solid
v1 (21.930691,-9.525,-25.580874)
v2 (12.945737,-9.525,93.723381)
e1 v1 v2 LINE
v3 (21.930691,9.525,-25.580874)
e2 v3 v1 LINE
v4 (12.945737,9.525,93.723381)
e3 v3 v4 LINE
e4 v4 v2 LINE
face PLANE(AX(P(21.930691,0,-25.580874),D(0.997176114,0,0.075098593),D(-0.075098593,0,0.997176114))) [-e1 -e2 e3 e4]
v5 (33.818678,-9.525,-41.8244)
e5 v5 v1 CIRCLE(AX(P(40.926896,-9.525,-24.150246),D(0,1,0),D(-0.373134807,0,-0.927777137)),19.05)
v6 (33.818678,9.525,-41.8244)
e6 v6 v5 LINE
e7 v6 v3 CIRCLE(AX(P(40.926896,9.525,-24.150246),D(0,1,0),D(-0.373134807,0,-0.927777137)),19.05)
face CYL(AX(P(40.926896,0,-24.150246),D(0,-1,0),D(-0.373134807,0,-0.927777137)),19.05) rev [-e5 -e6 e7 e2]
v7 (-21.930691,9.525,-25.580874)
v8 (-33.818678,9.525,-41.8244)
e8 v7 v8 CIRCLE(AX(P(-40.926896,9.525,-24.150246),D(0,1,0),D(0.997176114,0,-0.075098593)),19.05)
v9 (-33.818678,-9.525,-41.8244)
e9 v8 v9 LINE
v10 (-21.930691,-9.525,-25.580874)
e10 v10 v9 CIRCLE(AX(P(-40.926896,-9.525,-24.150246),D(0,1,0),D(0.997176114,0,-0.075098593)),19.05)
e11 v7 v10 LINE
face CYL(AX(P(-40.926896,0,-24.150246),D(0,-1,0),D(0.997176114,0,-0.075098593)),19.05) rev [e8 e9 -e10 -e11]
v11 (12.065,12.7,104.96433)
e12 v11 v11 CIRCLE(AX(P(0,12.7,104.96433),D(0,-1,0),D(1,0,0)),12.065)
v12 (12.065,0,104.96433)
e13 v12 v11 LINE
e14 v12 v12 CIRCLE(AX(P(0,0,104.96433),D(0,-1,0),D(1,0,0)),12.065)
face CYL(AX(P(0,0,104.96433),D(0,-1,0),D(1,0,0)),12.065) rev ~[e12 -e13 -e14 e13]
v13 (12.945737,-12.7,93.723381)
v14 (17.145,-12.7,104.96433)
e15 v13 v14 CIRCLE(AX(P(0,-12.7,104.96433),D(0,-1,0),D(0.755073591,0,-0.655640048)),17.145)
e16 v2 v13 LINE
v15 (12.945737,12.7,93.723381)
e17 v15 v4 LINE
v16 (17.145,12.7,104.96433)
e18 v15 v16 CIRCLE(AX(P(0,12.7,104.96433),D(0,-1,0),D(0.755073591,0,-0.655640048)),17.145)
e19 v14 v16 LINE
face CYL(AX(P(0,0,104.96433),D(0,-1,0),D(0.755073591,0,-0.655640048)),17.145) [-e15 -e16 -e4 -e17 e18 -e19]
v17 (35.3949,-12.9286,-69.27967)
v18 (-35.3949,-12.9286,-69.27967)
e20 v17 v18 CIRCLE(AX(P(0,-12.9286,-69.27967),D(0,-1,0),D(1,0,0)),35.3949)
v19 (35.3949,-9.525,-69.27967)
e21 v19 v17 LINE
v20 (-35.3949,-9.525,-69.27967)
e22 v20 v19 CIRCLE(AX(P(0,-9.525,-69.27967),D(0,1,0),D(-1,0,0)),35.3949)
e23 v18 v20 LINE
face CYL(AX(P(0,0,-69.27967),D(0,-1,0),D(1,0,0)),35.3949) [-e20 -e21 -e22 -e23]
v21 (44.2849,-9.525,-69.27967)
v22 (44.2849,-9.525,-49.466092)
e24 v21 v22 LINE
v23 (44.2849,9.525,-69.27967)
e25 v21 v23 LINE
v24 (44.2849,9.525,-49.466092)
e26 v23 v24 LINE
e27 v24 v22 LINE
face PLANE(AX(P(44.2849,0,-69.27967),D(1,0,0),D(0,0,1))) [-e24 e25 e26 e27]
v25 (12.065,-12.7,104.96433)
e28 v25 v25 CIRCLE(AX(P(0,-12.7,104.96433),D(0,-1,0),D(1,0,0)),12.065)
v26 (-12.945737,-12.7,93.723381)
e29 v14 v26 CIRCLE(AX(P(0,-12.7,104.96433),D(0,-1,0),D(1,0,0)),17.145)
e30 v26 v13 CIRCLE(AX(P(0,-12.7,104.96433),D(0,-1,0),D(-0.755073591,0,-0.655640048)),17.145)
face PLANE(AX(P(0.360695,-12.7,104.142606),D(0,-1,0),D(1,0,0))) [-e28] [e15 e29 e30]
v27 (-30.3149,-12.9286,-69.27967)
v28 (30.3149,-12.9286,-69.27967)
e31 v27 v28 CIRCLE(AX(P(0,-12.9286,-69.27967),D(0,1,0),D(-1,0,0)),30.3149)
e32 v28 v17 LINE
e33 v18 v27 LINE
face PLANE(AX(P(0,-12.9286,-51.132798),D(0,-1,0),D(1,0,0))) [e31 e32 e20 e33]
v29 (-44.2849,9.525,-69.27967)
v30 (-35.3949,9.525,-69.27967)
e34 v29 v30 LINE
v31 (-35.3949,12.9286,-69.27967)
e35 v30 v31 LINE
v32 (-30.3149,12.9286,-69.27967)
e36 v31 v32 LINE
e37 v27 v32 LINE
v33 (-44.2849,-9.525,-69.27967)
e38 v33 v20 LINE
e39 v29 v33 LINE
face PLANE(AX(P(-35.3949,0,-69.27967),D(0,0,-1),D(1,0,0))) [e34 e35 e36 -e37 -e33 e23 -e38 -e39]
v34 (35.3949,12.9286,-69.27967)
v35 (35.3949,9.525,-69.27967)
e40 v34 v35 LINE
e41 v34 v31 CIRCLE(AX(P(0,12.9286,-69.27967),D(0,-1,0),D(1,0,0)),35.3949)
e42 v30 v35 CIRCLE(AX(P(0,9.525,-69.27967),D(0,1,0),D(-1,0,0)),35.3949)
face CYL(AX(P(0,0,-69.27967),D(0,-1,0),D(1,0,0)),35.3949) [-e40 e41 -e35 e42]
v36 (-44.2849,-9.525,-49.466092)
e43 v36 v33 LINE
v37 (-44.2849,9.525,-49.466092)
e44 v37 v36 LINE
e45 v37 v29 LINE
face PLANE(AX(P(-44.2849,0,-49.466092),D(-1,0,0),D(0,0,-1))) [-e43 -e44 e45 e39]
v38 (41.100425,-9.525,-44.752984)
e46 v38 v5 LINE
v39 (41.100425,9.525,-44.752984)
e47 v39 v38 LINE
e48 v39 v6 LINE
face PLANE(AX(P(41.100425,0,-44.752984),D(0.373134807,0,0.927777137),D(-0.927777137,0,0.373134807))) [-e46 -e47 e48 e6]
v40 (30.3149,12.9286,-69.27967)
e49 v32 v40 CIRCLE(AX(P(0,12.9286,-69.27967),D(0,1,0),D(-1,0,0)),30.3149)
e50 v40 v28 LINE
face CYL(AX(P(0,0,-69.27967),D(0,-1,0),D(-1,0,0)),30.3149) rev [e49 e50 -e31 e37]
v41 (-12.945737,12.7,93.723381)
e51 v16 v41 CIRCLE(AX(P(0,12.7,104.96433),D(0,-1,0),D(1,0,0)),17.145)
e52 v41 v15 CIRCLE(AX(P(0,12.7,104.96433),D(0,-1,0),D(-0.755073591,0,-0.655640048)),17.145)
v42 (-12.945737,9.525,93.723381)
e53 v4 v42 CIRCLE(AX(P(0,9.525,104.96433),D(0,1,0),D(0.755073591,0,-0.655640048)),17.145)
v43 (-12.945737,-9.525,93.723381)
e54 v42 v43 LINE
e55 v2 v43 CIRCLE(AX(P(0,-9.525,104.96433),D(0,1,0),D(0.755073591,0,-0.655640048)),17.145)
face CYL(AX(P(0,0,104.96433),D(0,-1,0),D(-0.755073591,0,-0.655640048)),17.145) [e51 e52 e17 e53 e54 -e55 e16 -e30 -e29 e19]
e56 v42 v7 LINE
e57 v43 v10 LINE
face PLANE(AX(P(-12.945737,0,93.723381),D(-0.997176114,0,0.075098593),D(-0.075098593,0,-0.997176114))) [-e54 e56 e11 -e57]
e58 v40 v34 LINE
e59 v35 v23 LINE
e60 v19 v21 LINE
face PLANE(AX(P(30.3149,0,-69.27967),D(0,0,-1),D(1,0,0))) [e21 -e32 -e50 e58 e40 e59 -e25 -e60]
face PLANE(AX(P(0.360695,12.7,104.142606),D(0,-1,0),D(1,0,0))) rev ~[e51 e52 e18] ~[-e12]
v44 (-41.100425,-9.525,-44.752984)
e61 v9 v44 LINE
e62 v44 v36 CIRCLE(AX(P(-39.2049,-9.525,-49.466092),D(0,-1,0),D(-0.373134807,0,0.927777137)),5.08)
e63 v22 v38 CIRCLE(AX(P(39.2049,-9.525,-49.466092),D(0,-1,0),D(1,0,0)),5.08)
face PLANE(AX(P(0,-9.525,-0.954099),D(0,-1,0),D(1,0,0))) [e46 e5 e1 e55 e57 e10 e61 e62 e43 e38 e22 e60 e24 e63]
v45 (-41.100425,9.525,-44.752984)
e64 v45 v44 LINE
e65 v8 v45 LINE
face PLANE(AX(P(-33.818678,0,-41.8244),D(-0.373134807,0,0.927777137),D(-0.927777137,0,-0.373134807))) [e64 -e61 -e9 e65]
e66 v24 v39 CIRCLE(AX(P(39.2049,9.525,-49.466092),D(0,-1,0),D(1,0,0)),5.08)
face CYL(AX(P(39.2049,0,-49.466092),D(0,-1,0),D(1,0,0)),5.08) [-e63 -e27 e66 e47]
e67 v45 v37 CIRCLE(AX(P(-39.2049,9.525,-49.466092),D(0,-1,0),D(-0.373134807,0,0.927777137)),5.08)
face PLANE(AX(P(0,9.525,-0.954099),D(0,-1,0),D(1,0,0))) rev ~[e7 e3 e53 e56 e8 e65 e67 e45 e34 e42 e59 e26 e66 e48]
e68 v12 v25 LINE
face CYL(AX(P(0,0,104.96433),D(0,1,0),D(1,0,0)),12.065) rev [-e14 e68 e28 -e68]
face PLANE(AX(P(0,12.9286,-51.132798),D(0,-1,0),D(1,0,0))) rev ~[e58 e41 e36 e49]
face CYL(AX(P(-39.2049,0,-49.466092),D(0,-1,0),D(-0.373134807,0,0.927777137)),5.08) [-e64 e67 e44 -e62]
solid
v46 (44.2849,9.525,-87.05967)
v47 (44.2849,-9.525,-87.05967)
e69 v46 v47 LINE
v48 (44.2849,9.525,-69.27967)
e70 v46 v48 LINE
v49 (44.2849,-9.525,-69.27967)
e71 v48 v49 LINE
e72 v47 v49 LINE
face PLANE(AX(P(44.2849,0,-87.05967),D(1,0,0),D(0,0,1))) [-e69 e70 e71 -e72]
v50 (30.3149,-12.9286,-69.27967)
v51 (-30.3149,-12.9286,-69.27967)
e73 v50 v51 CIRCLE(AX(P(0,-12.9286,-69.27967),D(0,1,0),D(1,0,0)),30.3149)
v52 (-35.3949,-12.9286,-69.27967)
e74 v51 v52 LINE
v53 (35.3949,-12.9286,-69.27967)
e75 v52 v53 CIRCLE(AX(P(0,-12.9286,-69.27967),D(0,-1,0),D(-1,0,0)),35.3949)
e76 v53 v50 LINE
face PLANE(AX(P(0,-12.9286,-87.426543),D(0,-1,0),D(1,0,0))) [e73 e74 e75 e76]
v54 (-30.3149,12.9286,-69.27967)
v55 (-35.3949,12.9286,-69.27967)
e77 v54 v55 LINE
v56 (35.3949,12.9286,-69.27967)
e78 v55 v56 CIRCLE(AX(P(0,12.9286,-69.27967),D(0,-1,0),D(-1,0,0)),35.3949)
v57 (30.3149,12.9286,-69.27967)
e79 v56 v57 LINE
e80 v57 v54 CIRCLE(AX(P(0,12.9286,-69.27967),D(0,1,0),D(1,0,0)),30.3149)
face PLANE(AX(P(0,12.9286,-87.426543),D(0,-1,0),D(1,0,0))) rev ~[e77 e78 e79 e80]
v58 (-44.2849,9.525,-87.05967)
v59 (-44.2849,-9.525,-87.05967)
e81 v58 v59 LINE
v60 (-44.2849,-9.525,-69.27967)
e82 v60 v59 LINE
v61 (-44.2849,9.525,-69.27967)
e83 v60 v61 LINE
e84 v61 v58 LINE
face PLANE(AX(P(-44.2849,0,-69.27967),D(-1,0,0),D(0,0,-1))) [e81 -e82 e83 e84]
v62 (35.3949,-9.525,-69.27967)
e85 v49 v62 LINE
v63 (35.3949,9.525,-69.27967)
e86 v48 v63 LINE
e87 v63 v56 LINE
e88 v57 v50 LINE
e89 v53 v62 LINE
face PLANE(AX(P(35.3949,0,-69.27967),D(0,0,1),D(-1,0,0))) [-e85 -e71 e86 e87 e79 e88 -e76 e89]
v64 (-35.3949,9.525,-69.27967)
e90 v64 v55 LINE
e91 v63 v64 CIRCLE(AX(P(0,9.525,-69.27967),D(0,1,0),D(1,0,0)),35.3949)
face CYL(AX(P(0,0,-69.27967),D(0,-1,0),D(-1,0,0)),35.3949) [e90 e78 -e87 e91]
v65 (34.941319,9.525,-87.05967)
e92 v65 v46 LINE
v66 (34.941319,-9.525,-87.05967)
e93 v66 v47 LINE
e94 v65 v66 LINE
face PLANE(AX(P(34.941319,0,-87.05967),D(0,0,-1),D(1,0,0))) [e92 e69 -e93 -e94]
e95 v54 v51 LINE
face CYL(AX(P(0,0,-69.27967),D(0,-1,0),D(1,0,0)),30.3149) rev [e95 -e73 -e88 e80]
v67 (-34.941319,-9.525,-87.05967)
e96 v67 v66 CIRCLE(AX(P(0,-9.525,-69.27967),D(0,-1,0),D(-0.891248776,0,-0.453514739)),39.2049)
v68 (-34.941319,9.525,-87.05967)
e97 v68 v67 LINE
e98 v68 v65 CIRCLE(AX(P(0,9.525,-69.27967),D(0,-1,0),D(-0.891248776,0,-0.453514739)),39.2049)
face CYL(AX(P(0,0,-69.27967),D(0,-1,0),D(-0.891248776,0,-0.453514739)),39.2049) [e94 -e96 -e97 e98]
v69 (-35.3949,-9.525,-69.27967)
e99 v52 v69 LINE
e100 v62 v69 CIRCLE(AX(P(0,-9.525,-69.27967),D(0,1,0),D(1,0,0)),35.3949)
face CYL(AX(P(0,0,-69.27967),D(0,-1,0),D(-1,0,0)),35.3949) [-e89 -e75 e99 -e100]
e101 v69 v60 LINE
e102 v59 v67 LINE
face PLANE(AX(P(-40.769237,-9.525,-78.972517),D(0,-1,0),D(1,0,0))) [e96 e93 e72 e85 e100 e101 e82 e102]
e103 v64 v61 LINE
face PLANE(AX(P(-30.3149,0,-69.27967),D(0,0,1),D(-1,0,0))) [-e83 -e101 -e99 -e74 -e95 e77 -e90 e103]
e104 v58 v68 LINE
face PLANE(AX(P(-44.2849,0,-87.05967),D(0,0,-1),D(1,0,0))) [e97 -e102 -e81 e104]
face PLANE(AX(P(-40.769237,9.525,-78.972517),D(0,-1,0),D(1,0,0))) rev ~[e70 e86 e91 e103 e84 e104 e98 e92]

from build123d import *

# Parameters (mm, degrees)
F1_DEPTH = 12.9286
F2_DEPTH = 9.525
F3_DEPTH = 12.9286
F4_DEPTH = 9.525
F0_R     = 12.065
F5_DEPTH = 12.7


with BuildPart() as f1:
    # F0 (on Front) → F1 (new body, symmetric)
    with BuildSketch(Plane.XZ):
        with BuildLine():
            ThreePointArc((-30.3149, -69.2796702024), (0, -38.9647702024), (30.3149, -69.2796702024))
            Line((30.3149, -69.2796702024), (35.3949, -69.2796702024))
            ThreePointArc((35.3949, -69.2796702024), (0, -33.8847702024), (-35.3949, -69.2796702024))
            Line((-35.3949, -69.2796702024), (-30.3149, -69.2796702024))
        make_face()
    extrude(amount=F1_DEPTH, both=True)

    # F0 (on Front) → F2 (join, symmetric)
    with BuildSketch(Plane.XZ):
        with BuildLine():
            ThreePointArc((-39.2049, -69.2796702024), (0, -30.0747702024), (39.2049, -69.2796702024))
            Line((39.2049, -69.2796702024), (44.2849, -69.2796702024))
            Line((44.2849, -69.2796702024), (44.2849, -49.4660918501))
            ThreePointArc((44.2849, -49.4660918501), (43.4141556404, -46.6220512467), (41.1004248213, -44.7529839952))
            Line((41.1004248213, -44.7529839952), (33.8186777373, -41.8243999769))
            ThreePointArc((33.8186777373, -41.8243999769), (25.5540866411, -35.4009894091), (21.9306908548, -25.5808737129))
            Line((21.9306908548, -25.5808737129), (12.9457367136, 93.7233811748))
            ThreePointArc((12.9457367136, 93.7233811748), (0, 87.8193297976), (-12.9457367136, 93.7233811748))
            Line((-12.9457367136, 93.7233811748), (-21.9306908548, -25.5808737129))
            ThreePointArc((-21.9306908548, -25.5808737129), (-25.5540866411, -35.4009894091), (-33.8186777373, -41.8243999769))
            Line((-33.8186777373, -41.8243999769), (-41.1004248213, -44.7529839952))
            ThreePointArc((-41.1004248213, -44.7529839952), (-43.4141556404, -46.6220512467), (-44.2849, -49.4660918501))
            Line((-44.2849, -49.4660918501), (-44.2849, -69.2796702024))
            Line((-44.2849, -69.2796702024), (-39.2049, -69.2796702024))
        make_face()
        with BuildLine():
            ThreePointArc((-35.3949, -69.2796702024), (0, -33.8847702024), (35.3949, -69.2796702024))
            Line((35.3949, -69.2796702024), (39.2049, -69.2796702024))
            ThreePointArc((39.2049, -69.2796702024), (0, -30.0747702024), (-39.2049, -69.2796702024))
            Line((-39.2049, -69.2796702024), (-35.3949, -69.2796702024))
        make_face()
    extrude(amount=F2_DEPTH, both=True)

    # F0 (on Front) → F5 (join, symmetric)
    with BuildSketch(Plane.XZ):
        with BuildLine():
            ThreePointArc((-12.9457367136, 93.7233811748), (0, 87.8193297976), (12.9457367136, 93.7233811748))
            ThreePointArc((12.9457367136, 93.7233811748), (16.0609103253, 98.9644810893), (17.145, 104.9643297976))
            ThreePointArc((17.145, 104.9643297976), (-5.9998487083, 121.0252401229), (-12.9457367136, 93.7233811748))
        make_face()
        with Locations((0, 104.9643297976)):
            Circle(F0_R, mode=Mode.SUBTRACT)
    extrude(amount=F5_DEPTH, both=True)


with BuildPart() as f3:
    # F0 (on Front) → F3 (new body, symmetric)
    with BuildSketch(Plane.XZ):
        with BuildLine():
            Line((35.3949, -69.2796702024), (30.3149, -69.2796702024))
            ThreePointArc((30.3149, -69.2796702024), (0, -99.5945702024), (-30.3149, -69.2796702024))
            Line((-30.3149, -69.2796702024), (-35.3949, -69.2796702024))
            ThreePointArc((-35.3949, -69.2796702024), (0, -104.6745702024), (35.3949, -69.2796702024))
        make_face()
    extrude(amount=F3_DEPTH, both=True)

    # F0 (on Front) → F4 (join, symmetric)
    with BuildSketch(Plane.XZ):
        with BuildLine():
            ThreePointArc((-34.941319151, -87.0596702024), (-38.1241072498, -78.4216957117), (-39.2049, -69.2796702024))
            Line((-39.2049, -69.2796702024), (-44.2849, -69.2796702024))
            Line((-44.2849, -69.2796702024), (-44.2849, -87.0596702024))
            Line((-44.2849, -87.0596702024), (-34.941319151, -87.0596702024))
        make_face()
        with BuildLine():
            Line((39.2049, -69.2796702024), (35.3949, -69.2796702024))
            ThreePointArc((35.3949, -69.2796702024), (0, -104.6745702024), (-35.3949, -69.2796702024))
            Line((-35.3949, -69.2796702024), (-39.2049, -69.2796702024))
            ThreePointArc((-39.2049, -69.2796702024), (-38.1241072498, -78.4216957117), (-34.941319151, -87.0596702024))
            ThreePointArc((-34.941319151, -87.0596702024), (0, -108.4845702024), (34.941319151, -87.0596702024))
            ThreePointArc((34.941319151, -87.0596702024), (38.1241072498, -78.4216957117), (39.2049, -69.2796702024))
        make_face()
        with BuildLine():
            Line((44.2849, -69.2796702024), (39.2049, -69.2796702024))
            ThreePointArc((39.2049, -69.2796702024), (38.1241072498, -78.4216957117), (34.941319151, -87.0596702024))
            Line((34.941319151, -87.0596702024), (44.2849, -87.0596702024))
            Line((44.2849, -87.0596702024), (44.2849, -69.2796702024))
        make_face()
    extrude(amount=F4_DEPTH, both=True)


solid = Compound([f1.part, f3.part])
